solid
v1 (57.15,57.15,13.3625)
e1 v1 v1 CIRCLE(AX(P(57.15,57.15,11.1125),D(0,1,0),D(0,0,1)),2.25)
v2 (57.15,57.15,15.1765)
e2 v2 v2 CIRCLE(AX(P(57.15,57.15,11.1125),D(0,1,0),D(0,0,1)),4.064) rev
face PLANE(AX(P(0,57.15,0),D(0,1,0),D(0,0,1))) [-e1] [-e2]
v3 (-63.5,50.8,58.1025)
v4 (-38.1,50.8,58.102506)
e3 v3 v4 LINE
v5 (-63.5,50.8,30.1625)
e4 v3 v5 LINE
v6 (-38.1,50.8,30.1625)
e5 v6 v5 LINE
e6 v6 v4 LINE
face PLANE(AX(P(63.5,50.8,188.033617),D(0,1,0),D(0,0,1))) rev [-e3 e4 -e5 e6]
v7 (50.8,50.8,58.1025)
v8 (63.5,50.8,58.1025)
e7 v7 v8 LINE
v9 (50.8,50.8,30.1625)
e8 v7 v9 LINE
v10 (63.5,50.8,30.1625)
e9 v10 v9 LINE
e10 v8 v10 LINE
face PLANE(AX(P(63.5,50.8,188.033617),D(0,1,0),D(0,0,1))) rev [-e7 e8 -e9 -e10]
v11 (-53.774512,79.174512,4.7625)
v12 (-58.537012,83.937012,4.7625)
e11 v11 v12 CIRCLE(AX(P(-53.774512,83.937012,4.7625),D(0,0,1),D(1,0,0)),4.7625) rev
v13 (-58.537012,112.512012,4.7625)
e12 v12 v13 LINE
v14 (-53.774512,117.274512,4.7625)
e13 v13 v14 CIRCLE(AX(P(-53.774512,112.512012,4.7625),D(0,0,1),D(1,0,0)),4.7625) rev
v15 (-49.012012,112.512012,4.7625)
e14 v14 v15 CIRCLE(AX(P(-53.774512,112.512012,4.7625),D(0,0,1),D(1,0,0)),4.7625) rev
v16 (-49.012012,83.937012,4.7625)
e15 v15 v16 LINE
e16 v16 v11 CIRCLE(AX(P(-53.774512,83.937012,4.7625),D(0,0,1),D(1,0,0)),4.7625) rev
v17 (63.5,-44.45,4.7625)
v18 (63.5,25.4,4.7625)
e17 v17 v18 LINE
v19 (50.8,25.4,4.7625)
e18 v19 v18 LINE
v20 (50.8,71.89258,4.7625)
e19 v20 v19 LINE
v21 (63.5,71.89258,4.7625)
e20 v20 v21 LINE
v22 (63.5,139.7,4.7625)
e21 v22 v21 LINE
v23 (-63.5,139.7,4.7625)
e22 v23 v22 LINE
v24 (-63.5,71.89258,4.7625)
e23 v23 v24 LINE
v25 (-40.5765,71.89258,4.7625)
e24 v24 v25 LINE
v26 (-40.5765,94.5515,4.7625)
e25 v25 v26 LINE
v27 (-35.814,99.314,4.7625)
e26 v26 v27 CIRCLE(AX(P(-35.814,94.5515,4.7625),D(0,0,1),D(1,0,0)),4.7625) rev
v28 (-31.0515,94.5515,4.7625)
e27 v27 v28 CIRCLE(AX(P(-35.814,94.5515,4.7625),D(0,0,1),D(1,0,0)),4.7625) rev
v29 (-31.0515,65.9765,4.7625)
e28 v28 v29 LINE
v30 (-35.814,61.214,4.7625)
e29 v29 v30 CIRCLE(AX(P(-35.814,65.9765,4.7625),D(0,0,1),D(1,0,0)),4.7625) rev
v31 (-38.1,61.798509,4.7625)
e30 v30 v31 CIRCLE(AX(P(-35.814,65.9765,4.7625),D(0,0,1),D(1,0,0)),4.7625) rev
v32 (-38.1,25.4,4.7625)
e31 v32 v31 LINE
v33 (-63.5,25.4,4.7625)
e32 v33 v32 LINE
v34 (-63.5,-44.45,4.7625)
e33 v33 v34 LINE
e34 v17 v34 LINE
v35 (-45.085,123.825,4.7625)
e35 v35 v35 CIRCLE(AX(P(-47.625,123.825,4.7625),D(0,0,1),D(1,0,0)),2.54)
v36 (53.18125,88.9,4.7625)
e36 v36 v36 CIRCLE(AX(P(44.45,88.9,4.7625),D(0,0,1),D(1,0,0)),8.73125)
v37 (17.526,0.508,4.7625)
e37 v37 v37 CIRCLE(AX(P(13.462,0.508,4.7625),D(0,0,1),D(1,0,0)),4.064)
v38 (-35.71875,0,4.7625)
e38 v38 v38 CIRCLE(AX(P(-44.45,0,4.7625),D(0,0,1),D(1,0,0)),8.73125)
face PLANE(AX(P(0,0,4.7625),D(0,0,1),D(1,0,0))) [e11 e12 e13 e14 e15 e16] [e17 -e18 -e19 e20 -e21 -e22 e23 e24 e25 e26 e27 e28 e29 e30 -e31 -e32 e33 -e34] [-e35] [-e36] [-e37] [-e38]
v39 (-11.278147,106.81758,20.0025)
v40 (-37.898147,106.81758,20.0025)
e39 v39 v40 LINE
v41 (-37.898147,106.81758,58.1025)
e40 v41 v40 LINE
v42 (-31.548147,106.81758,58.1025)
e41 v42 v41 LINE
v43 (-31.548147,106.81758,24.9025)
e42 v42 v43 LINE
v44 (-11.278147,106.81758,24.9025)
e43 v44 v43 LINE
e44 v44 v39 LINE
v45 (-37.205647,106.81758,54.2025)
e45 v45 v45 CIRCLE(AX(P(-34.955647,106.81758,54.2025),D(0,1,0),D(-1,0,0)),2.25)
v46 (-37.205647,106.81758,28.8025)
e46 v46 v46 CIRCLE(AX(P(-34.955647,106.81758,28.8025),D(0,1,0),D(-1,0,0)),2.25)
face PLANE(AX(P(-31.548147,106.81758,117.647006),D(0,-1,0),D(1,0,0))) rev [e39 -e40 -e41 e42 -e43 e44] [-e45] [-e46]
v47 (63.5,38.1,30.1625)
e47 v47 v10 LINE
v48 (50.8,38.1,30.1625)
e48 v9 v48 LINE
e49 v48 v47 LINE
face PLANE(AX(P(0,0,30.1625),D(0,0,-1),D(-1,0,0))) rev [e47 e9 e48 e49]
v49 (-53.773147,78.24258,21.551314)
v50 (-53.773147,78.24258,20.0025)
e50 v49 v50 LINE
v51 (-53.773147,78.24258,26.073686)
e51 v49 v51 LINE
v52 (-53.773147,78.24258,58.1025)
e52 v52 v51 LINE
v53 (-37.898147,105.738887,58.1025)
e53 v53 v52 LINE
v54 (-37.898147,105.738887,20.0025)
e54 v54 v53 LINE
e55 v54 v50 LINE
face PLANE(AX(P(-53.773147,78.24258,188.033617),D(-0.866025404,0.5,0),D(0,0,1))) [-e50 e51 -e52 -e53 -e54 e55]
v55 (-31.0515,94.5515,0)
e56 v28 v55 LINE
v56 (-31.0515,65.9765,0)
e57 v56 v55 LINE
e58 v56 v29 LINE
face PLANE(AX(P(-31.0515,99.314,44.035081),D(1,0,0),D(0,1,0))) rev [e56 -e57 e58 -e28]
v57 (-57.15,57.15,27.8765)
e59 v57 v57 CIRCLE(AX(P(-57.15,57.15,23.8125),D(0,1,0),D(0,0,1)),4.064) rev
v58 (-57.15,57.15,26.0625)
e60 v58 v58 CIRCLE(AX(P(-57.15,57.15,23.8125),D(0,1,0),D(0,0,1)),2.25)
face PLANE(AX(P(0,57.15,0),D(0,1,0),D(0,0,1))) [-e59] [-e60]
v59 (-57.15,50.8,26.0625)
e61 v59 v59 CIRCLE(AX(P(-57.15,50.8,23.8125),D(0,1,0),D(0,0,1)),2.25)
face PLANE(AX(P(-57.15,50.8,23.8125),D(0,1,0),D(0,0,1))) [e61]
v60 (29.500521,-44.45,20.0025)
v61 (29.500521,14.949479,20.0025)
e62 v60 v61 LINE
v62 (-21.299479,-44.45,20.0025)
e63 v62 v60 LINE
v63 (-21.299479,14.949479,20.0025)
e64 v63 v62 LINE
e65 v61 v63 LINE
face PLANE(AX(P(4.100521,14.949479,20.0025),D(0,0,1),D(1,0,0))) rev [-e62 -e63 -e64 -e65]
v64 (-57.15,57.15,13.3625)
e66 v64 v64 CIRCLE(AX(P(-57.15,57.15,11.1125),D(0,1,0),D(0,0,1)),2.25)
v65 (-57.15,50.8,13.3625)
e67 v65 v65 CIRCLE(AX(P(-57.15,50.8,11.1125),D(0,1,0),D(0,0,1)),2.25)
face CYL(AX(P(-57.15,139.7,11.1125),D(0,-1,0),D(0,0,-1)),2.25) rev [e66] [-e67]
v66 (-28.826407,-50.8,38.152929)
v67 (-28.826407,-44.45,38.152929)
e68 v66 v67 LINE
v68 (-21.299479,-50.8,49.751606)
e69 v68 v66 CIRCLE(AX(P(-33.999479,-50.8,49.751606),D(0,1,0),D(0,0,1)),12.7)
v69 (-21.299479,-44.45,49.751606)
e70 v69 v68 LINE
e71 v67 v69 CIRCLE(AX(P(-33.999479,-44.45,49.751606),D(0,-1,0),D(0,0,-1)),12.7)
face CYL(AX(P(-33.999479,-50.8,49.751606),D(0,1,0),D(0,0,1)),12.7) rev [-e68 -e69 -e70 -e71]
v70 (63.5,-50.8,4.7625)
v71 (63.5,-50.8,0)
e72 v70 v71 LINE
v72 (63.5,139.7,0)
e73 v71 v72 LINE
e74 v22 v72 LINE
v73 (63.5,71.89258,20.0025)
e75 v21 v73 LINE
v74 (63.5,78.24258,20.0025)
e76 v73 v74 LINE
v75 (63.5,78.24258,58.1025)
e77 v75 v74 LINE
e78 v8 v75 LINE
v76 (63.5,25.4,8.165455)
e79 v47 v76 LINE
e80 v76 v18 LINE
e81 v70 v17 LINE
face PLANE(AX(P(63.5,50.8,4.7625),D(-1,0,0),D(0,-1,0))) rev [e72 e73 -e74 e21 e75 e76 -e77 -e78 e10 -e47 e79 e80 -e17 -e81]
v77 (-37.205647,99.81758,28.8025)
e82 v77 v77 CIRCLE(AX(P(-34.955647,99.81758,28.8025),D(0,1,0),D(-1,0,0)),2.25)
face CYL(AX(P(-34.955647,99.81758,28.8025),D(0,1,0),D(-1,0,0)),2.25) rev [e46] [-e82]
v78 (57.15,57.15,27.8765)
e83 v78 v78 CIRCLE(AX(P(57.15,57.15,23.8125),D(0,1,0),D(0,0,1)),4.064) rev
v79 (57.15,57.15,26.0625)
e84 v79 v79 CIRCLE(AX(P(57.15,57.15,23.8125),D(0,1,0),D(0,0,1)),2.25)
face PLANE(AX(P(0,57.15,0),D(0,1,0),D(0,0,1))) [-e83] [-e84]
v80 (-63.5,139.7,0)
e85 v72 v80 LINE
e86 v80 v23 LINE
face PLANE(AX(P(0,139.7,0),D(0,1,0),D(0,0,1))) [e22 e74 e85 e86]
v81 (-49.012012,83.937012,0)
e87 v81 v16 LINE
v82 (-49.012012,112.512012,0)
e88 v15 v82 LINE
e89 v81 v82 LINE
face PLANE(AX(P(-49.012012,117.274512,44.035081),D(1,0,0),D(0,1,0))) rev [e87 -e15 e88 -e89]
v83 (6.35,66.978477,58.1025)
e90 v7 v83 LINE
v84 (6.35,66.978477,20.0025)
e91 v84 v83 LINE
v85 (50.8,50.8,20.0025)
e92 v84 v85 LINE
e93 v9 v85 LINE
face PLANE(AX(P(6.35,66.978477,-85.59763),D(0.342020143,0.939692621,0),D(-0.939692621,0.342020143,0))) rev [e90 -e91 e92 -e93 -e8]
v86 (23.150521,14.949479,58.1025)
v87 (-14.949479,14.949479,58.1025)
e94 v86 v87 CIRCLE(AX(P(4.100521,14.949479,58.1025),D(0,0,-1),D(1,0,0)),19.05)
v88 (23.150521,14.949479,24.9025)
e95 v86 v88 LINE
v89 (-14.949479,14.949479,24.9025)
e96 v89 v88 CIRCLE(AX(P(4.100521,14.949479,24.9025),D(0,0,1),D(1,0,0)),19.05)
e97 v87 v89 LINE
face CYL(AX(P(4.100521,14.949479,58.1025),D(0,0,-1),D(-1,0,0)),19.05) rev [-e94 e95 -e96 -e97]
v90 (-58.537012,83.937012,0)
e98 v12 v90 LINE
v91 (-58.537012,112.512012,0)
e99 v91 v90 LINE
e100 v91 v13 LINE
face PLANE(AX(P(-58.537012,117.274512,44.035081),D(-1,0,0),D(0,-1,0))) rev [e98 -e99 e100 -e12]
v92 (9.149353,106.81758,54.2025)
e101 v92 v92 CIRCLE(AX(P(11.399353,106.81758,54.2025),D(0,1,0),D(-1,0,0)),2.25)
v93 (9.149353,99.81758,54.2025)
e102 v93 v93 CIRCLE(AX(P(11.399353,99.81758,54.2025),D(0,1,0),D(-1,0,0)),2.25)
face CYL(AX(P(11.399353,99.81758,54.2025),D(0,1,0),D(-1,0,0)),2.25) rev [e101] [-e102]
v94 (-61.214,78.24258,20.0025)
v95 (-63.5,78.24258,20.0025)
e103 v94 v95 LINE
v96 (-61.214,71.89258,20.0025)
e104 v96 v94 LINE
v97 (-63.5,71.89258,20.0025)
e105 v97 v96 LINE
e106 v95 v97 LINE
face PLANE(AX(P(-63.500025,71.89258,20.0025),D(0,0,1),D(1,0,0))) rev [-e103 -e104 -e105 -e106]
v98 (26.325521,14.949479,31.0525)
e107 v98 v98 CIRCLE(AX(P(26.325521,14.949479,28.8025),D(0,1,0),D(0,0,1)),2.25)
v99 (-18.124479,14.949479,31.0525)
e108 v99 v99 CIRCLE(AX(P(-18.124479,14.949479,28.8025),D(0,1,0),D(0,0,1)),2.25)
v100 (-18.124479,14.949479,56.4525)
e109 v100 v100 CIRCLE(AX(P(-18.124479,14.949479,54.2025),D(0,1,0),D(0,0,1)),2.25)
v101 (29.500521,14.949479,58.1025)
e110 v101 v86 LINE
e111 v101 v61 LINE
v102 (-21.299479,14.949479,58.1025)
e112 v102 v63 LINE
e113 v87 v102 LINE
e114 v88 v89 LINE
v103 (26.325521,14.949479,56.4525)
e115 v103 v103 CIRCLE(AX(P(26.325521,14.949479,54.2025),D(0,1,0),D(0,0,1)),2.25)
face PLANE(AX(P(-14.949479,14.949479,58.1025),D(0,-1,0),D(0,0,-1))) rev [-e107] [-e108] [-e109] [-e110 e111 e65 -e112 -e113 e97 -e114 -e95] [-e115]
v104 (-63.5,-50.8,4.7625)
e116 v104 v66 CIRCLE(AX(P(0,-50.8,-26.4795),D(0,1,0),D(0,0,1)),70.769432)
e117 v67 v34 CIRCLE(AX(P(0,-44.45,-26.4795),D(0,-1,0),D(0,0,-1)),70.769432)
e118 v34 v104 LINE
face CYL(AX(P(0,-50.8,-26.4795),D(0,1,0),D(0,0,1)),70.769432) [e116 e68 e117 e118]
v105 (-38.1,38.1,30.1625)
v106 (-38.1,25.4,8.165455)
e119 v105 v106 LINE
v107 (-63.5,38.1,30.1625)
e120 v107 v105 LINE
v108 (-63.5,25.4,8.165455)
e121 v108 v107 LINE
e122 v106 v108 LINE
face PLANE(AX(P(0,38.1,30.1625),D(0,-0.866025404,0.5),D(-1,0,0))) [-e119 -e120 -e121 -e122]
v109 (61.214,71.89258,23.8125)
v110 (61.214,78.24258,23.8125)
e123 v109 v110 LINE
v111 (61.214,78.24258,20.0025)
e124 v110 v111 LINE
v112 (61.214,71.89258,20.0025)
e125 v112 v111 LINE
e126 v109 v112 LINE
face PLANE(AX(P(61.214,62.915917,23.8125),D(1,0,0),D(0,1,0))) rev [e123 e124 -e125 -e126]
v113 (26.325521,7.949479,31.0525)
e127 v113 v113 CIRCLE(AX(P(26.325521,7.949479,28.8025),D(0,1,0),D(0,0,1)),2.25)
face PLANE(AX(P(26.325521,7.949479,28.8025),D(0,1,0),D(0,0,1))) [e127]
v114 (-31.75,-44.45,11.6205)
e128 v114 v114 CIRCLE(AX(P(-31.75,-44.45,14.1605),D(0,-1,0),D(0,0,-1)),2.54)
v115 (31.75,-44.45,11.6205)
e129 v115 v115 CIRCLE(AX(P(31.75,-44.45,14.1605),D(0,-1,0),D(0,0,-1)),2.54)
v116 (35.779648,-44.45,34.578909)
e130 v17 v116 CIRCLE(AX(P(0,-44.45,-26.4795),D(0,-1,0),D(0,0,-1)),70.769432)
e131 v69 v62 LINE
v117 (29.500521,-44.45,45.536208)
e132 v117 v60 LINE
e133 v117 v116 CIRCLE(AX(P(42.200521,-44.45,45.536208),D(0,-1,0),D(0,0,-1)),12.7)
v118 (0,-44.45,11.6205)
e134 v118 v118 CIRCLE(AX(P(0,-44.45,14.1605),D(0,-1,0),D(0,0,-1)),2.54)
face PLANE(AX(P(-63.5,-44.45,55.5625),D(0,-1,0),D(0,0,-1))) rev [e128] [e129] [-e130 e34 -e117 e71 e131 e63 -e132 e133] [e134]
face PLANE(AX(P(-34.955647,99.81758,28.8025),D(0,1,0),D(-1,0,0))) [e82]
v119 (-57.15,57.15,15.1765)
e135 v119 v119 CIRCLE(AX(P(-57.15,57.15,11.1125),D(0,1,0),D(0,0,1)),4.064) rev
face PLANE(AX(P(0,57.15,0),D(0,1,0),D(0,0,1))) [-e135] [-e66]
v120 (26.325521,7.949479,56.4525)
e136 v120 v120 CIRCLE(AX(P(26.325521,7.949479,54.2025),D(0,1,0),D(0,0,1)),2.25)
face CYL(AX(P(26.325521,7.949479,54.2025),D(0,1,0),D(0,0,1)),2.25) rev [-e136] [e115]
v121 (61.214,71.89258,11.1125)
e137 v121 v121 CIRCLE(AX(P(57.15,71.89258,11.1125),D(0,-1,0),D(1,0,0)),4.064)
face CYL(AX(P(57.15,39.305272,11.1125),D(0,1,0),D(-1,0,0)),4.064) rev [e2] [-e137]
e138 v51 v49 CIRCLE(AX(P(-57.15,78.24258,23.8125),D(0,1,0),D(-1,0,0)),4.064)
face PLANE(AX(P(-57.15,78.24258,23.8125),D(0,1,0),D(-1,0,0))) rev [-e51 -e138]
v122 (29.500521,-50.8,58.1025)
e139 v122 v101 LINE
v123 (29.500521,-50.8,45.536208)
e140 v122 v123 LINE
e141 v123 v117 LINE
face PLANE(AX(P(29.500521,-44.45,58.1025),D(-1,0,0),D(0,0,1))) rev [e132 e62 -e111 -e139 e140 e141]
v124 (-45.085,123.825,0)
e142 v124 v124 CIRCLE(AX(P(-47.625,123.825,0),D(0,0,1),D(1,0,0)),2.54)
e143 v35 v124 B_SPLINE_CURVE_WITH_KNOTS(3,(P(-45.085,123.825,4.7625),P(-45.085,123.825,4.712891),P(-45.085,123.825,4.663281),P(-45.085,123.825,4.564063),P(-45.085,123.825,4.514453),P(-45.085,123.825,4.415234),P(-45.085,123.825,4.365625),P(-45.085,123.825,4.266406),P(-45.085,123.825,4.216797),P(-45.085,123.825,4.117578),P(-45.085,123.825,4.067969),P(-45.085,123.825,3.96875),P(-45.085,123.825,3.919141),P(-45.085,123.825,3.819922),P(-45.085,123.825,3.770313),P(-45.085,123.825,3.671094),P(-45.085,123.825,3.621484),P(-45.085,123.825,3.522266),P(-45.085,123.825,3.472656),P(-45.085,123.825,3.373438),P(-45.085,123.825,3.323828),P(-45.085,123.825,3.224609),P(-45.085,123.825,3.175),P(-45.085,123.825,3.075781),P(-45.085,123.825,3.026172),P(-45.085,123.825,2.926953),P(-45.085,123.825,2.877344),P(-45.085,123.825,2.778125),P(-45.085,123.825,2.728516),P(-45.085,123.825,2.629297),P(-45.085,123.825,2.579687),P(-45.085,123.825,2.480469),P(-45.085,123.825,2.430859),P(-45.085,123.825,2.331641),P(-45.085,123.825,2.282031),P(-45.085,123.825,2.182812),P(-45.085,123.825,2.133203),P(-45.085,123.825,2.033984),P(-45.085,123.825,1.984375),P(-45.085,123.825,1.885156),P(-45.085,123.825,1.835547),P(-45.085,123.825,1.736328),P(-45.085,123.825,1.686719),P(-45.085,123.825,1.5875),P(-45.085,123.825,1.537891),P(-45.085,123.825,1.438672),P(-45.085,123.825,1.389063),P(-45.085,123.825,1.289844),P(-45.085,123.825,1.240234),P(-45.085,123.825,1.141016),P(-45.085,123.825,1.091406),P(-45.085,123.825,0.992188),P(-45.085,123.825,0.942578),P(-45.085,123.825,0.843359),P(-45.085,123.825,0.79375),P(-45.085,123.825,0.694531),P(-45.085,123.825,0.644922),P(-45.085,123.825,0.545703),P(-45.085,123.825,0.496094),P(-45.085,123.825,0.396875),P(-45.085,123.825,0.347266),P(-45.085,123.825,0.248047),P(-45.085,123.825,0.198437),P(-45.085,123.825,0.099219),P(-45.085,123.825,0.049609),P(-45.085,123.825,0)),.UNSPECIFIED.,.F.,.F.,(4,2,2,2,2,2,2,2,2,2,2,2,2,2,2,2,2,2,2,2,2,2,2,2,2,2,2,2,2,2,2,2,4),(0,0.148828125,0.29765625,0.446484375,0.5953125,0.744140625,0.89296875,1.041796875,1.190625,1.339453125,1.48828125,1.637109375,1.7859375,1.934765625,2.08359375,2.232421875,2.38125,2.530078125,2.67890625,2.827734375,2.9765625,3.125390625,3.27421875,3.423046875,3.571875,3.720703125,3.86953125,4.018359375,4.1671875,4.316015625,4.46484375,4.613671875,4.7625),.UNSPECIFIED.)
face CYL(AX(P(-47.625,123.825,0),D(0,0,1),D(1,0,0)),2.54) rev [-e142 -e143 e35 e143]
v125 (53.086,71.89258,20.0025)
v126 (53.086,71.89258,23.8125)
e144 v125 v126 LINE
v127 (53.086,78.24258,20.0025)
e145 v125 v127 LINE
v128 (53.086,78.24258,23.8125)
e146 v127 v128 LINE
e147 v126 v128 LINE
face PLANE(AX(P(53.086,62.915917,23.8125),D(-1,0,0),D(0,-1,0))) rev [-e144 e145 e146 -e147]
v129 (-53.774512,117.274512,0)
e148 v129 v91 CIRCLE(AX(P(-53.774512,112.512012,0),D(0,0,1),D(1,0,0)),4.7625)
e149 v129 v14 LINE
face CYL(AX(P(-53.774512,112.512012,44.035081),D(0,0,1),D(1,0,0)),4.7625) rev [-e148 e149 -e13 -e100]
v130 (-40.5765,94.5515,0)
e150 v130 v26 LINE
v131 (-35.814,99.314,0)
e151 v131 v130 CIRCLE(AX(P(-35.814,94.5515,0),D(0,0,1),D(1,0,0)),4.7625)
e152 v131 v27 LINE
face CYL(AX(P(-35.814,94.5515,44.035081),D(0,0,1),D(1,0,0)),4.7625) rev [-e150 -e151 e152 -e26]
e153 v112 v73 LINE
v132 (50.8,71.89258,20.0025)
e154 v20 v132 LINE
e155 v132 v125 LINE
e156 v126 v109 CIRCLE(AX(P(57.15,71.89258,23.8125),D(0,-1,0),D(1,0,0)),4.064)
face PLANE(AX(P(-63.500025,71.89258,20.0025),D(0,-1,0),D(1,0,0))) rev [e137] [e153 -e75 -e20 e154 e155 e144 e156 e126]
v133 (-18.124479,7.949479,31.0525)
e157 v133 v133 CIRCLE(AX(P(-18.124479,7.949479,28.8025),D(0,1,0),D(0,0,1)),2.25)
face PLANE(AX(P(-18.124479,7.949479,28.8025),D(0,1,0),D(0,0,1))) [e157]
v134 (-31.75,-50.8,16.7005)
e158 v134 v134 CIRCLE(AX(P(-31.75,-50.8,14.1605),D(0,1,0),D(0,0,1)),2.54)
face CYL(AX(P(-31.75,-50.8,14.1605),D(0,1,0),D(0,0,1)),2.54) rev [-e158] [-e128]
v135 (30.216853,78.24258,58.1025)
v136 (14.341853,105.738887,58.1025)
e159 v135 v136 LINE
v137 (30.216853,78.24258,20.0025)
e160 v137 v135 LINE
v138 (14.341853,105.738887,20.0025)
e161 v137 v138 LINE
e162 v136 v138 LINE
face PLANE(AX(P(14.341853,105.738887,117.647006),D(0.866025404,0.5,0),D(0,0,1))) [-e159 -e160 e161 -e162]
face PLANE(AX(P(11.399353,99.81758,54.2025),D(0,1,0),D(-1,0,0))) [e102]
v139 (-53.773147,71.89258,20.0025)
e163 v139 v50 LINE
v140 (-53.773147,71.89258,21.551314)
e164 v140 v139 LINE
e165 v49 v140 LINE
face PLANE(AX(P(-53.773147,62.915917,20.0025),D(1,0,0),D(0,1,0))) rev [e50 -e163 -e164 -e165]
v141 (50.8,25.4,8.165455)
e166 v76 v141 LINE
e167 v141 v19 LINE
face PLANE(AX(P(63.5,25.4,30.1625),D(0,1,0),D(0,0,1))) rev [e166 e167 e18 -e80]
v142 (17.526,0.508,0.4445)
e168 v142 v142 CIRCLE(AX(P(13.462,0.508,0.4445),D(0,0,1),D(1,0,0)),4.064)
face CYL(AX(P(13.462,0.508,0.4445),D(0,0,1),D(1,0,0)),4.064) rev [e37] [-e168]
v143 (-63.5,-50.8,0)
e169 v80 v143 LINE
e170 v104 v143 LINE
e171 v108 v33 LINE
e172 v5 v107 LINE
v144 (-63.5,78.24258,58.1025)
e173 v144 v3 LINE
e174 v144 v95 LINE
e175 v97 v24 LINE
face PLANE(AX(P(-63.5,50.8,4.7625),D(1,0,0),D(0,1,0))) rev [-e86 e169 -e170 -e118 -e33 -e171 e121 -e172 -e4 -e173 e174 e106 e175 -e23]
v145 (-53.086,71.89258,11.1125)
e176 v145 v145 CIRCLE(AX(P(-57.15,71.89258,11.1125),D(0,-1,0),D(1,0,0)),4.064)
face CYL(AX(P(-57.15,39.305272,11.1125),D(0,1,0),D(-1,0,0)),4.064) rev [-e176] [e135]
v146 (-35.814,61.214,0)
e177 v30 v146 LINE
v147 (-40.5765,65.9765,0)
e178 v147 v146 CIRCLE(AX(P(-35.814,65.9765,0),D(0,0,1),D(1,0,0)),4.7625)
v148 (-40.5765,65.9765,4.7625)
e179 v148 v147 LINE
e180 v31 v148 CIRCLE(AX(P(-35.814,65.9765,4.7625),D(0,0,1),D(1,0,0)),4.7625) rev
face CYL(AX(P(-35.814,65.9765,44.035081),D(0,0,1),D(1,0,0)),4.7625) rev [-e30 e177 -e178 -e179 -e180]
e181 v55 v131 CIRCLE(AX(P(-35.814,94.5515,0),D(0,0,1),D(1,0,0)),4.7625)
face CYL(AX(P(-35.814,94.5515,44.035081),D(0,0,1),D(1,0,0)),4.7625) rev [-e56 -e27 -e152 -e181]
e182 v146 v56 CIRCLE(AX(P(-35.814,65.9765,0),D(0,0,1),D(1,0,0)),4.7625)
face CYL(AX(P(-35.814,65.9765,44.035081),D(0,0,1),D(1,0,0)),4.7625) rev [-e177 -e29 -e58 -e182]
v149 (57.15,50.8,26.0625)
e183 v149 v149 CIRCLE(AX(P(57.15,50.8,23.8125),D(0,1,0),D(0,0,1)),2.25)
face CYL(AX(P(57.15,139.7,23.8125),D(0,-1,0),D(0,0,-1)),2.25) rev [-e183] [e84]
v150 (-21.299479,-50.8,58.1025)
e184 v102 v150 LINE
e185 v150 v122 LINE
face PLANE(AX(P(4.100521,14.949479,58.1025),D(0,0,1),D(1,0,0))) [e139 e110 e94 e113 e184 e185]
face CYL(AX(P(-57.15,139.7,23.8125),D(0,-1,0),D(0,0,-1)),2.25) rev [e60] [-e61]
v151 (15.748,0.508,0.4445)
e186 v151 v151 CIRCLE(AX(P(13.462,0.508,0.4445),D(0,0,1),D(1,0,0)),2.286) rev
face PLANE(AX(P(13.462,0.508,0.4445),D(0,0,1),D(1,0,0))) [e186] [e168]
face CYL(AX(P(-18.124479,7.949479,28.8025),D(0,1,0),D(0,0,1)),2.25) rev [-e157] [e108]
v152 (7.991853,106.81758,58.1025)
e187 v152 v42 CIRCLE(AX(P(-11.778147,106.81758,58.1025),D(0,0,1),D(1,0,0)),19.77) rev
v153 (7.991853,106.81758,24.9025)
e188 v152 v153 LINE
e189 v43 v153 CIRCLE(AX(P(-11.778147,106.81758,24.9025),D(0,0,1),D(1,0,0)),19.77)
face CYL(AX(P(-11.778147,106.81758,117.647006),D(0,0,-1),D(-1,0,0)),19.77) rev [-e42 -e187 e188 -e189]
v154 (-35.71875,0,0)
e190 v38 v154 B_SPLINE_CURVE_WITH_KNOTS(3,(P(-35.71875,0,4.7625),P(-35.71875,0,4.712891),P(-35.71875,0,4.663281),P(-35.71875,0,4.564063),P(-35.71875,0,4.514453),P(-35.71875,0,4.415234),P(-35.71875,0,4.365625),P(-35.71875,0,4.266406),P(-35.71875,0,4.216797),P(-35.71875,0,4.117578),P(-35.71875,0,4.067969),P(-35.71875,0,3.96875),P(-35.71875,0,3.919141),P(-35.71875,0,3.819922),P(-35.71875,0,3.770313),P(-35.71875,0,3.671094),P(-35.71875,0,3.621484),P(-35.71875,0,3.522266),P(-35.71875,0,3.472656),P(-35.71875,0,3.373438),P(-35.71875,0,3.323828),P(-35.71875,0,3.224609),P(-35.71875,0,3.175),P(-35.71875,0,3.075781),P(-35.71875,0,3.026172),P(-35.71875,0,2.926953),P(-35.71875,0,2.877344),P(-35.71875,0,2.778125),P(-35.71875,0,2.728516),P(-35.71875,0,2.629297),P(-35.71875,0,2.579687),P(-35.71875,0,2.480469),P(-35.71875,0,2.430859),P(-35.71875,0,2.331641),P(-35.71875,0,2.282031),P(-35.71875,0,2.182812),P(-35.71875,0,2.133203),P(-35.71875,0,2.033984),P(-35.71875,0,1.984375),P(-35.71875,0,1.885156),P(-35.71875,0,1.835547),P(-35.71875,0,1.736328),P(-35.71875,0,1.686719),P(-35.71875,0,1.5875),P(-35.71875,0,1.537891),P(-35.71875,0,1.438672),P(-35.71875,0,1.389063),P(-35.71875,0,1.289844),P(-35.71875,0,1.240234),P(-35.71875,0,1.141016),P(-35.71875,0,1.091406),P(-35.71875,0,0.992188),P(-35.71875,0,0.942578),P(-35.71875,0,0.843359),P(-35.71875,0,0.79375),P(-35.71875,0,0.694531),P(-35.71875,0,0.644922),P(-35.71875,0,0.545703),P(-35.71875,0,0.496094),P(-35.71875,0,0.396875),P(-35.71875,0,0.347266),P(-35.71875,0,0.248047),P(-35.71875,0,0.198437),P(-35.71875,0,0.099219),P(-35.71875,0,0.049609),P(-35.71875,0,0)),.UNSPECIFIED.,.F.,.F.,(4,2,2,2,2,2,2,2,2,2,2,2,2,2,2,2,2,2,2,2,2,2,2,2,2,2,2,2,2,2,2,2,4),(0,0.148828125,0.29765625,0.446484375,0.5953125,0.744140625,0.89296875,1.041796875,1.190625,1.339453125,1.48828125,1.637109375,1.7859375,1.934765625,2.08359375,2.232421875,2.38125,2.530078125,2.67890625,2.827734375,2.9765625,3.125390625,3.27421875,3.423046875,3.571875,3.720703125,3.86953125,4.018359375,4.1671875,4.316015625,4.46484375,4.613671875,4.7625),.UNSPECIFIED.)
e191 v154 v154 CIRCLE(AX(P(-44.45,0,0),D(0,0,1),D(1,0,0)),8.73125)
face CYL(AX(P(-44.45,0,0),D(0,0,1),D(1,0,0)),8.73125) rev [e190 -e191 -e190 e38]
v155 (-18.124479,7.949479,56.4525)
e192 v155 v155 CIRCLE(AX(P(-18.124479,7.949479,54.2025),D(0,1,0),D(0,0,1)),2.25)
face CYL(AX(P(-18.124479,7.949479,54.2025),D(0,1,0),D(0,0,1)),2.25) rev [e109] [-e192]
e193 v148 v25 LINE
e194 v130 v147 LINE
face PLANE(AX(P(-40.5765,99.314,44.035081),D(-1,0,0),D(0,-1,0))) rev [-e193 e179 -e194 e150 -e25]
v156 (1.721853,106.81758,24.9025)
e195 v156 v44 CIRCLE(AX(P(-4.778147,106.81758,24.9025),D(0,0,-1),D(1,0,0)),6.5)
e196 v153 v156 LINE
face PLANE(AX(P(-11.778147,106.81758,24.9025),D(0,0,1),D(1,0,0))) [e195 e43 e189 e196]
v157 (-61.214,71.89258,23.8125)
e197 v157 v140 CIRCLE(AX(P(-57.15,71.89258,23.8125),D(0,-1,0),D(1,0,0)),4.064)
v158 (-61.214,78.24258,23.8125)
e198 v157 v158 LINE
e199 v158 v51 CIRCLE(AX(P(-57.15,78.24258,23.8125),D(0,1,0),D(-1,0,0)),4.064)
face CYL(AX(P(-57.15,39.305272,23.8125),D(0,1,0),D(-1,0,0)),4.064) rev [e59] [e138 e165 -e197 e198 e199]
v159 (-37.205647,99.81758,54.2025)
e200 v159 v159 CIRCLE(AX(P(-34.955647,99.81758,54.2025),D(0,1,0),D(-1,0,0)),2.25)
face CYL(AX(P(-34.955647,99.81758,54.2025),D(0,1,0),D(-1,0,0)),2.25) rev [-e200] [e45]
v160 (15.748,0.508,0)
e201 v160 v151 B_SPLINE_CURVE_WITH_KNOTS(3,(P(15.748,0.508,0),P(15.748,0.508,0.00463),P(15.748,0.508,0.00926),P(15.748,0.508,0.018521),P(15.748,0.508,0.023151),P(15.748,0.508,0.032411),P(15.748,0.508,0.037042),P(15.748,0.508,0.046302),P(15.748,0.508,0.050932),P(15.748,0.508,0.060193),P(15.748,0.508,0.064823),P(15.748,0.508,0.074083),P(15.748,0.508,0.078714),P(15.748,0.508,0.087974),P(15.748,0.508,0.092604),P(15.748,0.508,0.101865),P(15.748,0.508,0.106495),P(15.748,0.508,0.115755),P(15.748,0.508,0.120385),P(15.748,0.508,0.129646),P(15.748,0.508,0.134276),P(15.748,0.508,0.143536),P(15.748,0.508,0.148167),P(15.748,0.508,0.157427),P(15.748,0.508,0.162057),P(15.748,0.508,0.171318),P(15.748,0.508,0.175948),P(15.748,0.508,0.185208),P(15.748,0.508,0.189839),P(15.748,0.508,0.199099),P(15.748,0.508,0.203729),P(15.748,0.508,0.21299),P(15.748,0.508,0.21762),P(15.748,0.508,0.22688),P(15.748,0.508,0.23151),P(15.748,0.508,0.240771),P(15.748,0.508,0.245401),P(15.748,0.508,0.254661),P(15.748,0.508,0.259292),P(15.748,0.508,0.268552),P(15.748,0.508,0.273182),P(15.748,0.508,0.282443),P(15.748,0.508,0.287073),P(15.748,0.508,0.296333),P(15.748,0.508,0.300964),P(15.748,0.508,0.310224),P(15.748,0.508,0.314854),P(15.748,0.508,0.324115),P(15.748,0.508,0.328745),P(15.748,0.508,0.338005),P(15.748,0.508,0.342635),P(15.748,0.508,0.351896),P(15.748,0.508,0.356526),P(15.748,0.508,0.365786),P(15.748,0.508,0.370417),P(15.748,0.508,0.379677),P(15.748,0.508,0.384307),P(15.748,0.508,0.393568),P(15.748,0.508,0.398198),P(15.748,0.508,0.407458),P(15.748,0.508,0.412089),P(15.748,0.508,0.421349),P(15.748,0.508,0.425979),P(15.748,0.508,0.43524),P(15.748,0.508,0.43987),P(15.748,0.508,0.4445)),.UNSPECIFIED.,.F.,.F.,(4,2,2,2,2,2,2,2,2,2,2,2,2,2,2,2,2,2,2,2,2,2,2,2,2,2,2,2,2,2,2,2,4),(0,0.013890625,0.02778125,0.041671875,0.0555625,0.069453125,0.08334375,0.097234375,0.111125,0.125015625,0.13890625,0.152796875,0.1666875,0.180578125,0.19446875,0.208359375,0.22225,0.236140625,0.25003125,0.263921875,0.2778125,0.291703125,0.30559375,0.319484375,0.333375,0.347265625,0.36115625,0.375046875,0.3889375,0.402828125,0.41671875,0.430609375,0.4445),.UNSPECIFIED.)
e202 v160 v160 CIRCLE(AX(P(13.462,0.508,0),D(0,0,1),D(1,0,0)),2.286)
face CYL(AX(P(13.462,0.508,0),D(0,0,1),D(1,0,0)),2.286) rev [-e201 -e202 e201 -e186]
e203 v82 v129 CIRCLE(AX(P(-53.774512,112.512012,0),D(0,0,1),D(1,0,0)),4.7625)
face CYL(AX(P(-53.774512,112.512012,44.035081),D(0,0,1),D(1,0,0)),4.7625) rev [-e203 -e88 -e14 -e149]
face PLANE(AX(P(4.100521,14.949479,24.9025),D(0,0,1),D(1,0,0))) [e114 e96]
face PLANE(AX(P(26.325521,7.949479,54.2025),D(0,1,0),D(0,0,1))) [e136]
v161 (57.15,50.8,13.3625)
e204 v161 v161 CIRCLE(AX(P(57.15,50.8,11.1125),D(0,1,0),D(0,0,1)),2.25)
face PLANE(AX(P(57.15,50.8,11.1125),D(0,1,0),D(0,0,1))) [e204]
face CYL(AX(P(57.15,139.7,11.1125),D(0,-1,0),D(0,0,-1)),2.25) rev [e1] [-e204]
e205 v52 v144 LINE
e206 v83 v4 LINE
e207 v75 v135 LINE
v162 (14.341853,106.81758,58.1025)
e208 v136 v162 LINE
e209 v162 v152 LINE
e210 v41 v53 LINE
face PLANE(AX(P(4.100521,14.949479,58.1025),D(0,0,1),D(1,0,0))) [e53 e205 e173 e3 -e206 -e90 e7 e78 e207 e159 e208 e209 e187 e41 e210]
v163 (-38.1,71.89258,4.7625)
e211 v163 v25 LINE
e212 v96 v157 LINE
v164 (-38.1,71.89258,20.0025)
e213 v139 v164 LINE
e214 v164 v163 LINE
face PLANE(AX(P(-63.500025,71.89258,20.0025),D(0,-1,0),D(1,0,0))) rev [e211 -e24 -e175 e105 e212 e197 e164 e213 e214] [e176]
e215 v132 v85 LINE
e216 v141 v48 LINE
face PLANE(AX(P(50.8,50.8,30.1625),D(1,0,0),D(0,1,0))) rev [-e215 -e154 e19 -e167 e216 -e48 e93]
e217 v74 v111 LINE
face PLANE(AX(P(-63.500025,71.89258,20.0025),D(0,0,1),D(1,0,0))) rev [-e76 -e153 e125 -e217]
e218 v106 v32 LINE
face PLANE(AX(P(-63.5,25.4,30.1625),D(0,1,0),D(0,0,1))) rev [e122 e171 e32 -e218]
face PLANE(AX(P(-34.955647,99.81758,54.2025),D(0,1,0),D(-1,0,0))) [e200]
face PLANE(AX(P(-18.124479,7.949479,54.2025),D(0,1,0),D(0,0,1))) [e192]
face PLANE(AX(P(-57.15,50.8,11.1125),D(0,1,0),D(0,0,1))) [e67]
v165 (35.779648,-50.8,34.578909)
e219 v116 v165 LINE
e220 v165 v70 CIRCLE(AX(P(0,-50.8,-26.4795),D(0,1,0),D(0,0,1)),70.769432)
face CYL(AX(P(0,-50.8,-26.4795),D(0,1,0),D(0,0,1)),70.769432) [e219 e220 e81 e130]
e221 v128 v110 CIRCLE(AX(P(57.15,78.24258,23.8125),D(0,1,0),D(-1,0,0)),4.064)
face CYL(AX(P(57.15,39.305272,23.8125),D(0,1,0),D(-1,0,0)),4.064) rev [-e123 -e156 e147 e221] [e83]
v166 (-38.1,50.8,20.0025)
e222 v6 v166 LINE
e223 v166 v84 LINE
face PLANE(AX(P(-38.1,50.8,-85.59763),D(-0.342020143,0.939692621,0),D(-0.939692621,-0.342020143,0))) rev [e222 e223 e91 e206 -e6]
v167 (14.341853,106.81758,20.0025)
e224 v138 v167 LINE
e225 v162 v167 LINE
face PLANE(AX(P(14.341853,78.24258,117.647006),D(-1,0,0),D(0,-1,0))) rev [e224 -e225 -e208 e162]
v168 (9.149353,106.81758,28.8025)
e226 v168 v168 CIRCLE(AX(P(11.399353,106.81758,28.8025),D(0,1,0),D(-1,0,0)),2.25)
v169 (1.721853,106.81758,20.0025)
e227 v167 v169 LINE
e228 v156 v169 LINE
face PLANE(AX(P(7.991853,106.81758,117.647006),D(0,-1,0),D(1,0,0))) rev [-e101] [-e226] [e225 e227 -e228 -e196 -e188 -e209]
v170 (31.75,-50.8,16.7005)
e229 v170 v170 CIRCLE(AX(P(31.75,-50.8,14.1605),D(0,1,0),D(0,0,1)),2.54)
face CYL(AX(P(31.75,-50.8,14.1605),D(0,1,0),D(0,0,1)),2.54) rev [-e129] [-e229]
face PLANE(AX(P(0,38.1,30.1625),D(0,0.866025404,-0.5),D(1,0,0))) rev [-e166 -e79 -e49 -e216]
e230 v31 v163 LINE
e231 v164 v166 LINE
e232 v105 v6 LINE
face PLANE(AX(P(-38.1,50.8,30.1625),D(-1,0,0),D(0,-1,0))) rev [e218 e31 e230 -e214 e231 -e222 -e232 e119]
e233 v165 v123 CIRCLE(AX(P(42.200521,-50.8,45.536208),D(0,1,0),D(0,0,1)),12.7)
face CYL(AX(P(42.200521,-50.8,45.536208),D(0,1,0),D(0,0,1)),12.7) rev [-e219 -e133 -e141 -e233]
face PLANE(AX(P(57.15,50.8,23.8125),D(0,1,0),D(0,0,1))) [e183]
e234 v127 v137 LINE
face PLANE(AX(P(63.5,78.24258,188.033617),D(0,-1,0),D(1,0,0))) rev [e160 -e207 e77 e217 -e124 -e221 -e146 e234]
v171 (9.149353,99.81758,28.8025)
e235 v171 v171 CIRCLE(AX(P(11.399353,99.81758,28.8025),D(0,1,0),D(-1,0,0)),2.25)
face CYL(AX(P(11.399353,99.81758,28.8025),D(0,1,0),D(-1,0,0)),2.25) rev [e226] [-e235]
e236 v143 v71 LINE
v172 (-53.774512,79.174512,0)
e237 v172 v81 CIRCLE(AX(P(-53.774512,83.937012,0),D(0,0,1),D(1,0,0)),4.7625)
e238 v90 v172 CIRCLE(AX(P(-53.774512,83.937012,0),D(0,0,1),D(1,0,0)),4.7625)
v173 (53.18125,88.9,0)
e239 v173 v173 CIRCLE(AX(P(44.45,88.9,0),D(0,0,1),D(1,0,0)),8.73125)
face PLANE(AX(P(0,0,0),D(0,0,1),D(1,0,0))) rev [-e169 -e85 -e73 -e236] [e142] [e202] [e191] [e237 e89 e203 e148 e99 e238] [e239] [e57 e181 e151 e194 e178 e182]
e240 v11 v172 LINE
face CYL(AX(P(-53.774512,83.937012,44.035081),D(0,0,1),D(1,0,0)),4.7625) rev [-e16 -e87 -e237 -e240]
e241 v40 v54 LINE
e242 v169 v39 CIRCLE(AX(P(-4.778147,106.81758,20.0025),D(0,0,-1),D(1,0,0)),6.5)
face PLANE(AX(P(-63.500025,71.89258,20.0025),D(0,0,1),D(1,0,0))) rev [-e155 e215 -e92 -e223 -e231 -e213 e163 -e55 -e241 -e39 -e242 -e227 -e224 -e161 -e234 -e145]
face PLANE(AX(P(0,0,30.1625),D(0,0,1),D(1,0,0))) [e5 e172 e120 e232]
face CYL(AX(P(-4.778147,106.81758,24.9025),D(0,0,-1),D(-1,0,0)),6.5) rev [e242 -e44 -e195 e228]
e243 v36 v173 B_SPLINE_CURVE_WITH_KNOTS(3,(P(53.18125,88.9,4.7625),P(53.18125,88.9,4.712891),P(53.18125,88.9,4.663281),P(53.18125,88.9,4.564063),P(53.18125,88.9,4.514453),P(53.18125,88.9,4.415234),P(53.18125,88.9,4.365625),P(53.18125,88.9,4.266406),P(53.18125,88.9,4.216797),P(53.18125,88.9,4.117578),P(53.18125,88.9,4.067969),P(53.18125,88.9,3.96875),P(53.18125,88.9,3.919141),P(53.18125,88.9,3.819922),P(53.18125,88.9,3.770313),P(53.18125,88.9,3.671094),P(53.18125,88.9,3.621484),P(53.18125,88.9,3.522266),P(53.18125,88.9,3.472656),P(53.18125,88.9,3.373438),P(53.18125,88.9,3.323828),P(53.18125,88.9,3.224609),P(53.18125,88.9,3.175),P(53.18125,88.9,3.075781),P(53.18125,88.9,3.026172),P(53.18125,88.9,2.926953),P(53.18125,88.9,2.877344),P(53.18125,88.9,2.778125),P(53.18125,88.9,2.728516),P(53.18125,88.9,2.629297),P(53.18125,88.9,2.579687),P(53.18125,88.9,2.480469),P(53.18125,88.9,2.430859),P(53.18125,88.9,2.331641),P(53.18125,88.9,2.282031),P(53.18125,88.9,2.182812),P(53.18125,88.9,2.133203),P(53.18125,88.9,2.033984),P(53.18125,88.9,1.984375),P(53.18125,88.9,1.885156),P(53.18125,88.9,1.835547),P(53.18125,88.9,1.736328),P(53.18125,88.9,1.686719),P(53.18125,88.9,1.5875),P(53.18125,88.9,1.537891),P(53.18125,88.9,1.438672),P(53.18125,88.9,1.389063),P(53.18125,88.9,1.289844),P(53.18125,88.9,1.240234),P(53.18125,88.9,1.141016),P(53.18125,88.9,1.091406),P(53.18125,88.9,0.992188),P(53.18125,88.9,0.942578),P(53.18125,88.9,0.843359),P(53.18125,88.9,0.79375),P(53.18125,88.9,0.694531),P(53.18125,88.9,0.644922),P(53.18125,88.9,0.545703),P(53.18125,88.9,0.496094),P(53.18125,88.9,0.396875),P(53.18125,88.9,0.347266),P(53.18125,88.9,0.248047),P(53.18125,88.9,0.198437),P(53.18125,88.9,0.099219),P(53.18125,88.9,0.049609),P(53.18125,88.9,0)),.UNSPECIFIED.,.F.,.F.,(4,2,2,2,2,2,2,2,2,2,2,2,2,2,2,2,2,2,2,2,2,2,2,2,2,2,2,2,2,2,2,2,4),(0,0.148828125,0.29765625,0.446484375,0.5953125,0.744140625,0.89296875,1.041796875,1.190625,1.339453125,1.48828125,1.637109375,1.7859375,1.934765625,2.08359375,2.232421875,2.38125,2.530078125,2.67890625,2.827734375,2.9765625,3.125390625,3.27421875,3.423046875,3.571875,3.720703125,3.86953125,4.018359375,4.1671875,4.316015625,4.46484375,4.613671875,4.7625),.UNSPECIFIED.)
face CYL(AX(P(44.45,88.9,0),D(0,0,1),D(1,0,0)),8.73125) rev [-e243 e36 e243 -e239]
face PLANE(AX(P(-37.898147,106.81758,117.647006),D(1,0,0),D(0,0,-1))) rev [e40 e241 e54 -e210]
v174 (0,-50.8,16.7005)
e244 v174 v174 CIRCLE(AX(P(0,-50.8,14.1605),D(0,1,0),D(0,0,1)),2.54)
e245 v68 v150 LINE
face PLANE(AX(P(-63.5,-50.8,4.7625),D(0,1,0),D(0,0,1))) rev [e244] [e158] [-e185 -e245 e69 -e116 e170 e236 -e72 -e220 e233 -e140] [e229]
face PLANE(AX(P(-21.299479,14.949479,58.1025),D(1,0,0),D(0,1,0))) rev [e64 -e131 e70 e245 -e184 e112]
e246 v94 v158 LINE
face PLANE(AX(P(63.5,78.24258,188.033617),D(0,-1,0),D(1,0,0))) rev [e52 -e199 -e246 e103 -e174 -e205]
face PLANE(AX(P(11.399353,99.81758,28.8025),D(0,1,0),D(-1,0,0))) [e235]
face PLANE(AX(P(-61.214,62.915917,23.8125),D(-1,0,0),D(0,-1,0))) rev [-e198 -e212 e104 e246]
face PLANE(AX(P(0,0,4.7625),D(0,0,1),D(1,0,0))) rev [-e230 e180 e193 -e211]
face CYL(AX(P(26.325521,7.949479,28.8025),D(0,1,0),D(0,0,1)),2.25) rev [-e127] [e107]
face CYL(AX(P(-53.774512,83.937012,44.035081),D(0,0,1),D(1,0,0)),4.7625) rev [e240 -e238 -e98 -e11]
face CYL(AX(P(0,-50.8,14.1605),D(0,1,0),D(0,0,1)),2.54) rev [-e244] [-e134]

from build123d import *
from OCP.BRepFilletAPI import BRepFilletAPI_MakeChamfer

# Parameters (mm, degrees)
SKETCH1_W                      = 127
SKETCH1_H                      = 101.6
BOSS_EXTRUDE1_DEPTH            = 4.7625
SKETCH2_W                      = 127
SKETCH2_H                      = 6.35
BOSS_EXTRUDE2_DEPTH            = 50.8
CUT_EXTRUDE1_DEPTH             = 96.882897328
CUT_EXTRUDE1_DEPTH_BACK        = 96.882897328
SKETCH3_R                      = 8.73125
CUT_EXTRUDE2_DEPTH             = 96.882897328
CUT_EXTRUDE2_DEPTH_BACK        = 96.882897328
SKETCH4_R                      = 2.286
CUT_EXTRUDE3_DEPTH             = 128.247805114
CUT_EXTRUDE3_DEPTH_BACK        = 128.247805114
SKETCH5_R                      = 2.54
CUT_EXTRUDE4_START             = -6.35
CUT_EXTRUDE4_DEPTH             = 6.35
SKETCH7_R                      = 4.064
CUT_EXTRUDE5_DEPTH             = 4.318
BOSS_EXTRUDE3_DEPTH            = 38.1
BOSS_EXTRUDE4_DEPTH            = 4.9
SKETCH15_W                     = 25.4
SKETCH15_H                     = 25.4
SKETCH15_W_2                   = 12.7
BOSS_EXTRUDE5_DEPTH            = 25.4
CHAMFER1_SIZE                  = 12.7
CHAMFER1_SIZE2                 = 21.997045256
SKETCH17_W                     = 127
SKETCH17_H                     = 4.7625
BOSS_EXTRUDE6_DEPTH            = 88.9
CUT_EXTRUDE7_DEPTH             = 163.460750952
CUT_EXTRUDE7_DEPTH_BACK        = 163.460750952
SKETCH18_R                     = 8.73125
SKETCH31_R                     = 2.249999945
CUT_EXTRUDE16_DEPTH            = 7
BOSS_EXTRUDE7_DEPTH            = 53.34
SKETCH20_W                     = 127
SKETCH20_H                     = 27.442580258
BOSS_EXTRUDE8_DEPTH            = 53.34
CUT_EXTRUDE8_REACH             = 166.086
CUT_EXTRUDE8_DIRECTION_2_DEPTH = 165.086076515
CHAMFER2_SIZE                  = 15.875
CHAMFER2_SIZE2                 = 27.49630657
CUT_EXTRUDE9_DEPTH             = 198.537314212
CUT_EXTRUDE9_DEPTH_BACK        = 198.537314212
SKETCH22_W                     = 15.24
SKETCH22_H                     = 47.382896715
SKETCH23_W                     = 88.9
SKETCH23_H                     = 15.24
CUT_EXTRUDE10_DEPTH            = 134.156714086
BOSS_EXTRUDE9_DEPTH            = 4.9
SKETCH16_R                     = 2.25
CUT_EXTRUDE6_DEPTH             = 134.156714086
SKETCH26_R                     = 4.064
CUT_EXTRUDE11_DEPTH            = 21.092580258
SKETCH27_W                     = 7.440852829
SKETCH27_H                     = 3.81
SKETCH27_W_2                   = 8.128
CUT_EXTRUDE12_DEPTH            = 6.35
CUT_EXTRUDE13_DEPTH            = 163.460750952
CUT_EXTRUDE13_DEPTH_BACK       = 163.460750952
SKETCH28_R                     = 2.54
CUT_EXTRUDE14_DEPTH            = 165.086076515
CUT_EXTRUDE14_DEPTH_BACK       = 4.7625
SKETCH29_W                     = 9.525
SKETCH29_H                     = 38.1
FILLET1_R                      = 4.7625
SKETCH30_R                     = 2.25
CUT_EXTRUDE15_DEPTH            = 7
BOSS_EXTRUDE10_START           = 6.35
BOSS_EXTRUDE10_DEPTH           = 6.35
FILLET2_R                      = 12.7


# Read off the part's stored shape, not the designer's step: Cut-Extrude4
with BuildPart() as part:
    # Sketch1 → Boss-Extrude1 (new body)
    with BuildSketch(Plane.XY):
        Rectangle(SKETCH1_W, SKETCH1_H)
    extrude(amount=BOSS_EXTRUDE1_DEPTH)

    # Sketch2 → Boss-Extrude2 (add)
    with BuildSketch(Plane.XY.offset(4.7625)):
        with Locations((0, -47.625)):
            Rectangle(SKETCH2_W, SKETCH2_H)
    extrude(amount=BOSS_EXTRUDE2_DEPTH)

    # Sketch3 → Cut-Extrude1 (cut, two sides: drawn at the far end of the back side and taken through both)
    with BuildSketch(Plane.XY.offset(4.7625).offset(-CUT_EXTRUDE1_DEPTH_BACK)):
        with Locations((-44.45, 0)):
            Circle(SKETCH3_R)
    extrude(amount=CUT_EXTRUDE1_DEPTH + CUT_EXTRUDE1_DEPTH_BACK, mode=Mode.SUBTRACT)

    # Sketch4 → Cut-Extrude2 (cut, two sides: drawn at the far end of the back side and taken through both)
    with BuildSketch(Plane.XY.offset(4.7625).offset(-CUT_EXTRUDE2_DEPTH_BACK)):
        with Locations((13.462, 0.508)):
            Circle(SKETCH4_R)
    extrude(amount=CUT_EXTRUDE2_DEPTH + CUT_EXTRUDE2_DEPTH_BACK, mode=Mode.SUBTRACT)

    # Sketch5 → Cut-Extrude3 (cut, two sides: drawn at the far end of the back side and taken through both)
    with BuildSketch(Plane(origin=(0, -44.45, 0), x_dir=(1, 0, 0), z_dir=(0, 1, 0)).offset(-CUT_EXTRUDE3_DEPTH_BACK)):
        with Locations(Location((-31.75, -14.1605, 0), (0, 0, 270))):
            Circle(SKETCH5_R)
        with Locations(Location((0, -14.1605, 0), (0, 0, 270))):
            Circle(SKETCH5_R)
        with Locations(Location((31.75, -14.1605, 0), (0, 0, 270))):
            Circle(SKETCH5_R)
    extrude(amount=CUT_EXTRUDE3_DEPTH + CUT_EXTRUDE3_DEPTH_BACK, mode=Mode.SUBTRACT)

    # Cut-Extrude4 outline → Cut-Extrude4 (cut)
    with BuildSketch(Plane(origin=(0, -44.45, 0), x_dir=(1, 0, 0), z_dir=(0, 1, 0)).offset(CUT_EXTRUDE4_START)):
        with BuildLine():
            ThreePointArc((63.5, -4.7625), (0, -44.289932413), (-63.5, -4.7625))
            Line((-63.5, -4.7625), (-63.5, -55.5625))
            Line((-63.5, -55.5625), (63.5, -55.5625))
            Line((63.5, -55.5625), (63.5, -4.7625))
        make_face()
    extrude(amount=CUT_EXTRUDE4_DEPTH, mode=Mode.SUBTRACT)

    # Sketch7 → Cut-Extrude5 (cut)
    with BuildSketch(Plane.XY.offset(4.7625)):
        with Locations((13.462, 0.508)):
            Circle(SKETCH7_R)
    extrude(amount=-CUT_EXTRUDE5_DEPTH, mode=Mode.SUBTRACT)

    # Sketch11 → Boss-Extrude3 (add)
    with BuildSketch(Plane.XY.offset(20.0025)):
        with BuildLine():
            Line((-14.949479175, 14.949479175), (-21.299479175, 14.949479175))
            Line((-21.299479175, 14.949479175), (-21.299479175, -44.45))
            Line((-21.299479175, -44.45), (29.500520825, -44.45))
            Line((29.500520825, -44.45), (29.500520825, 14.949479175))
            Line((29.500520825, 14.949479175), (23.150520825, 14.949479175))
            ThreePointArc((23.150520825, 14.949479175), (4.100520825, -4.100520825), (-14.949479175, 14.949479175))
        make_face()
    extrude(amount=BOSS_EXTRUDE3_DEPTH)

    # Sketch14 → Boss-Extrude4 (add)
    with BuildSketch(Plane.XY.offset(20.0025)):
        with BuildLine():
            Line((-14.949479175, 14.949479175), (23.150520825, 14.949479175))
            ThreePointArc((23.150520825, 14.949479175), (4.100520825, -4.100520825), (-14.949479175, 14.949479175))
        make_face()
    extrude(amount=BOSS_EXTRUDE4_DEPTH)

    # Sketch15 → Boss-Extrude5 (add)
    with BuildSketch(Plane.XY.offset(4.7625)):
        with Locations((-50.8, 38.1)):
            Rectangle(SKETCH15_W, SKETCH15_H)
        with Locations((57.15, 38.1)):
            Rectangle(SKETCH15_W_2, SKETCH15_H)
    extrude(amount=BOSS_EXTRUDE5_DEPTH)

    # Chamfer1: one chamfer whose edges measure the first distance from different faces: ONE call of the kernel's chamfer builder (chamfer() names one face for all edges)
    chamfer1_edges_1 = [part.edges().sort_by_distance(p)[0] for p in [
        (-50.8, 25.4, 30.1625),
    ]]
    chamfer1_side_1 = [part.faces().sort_by_distance(p)[0] for p in [
        (-50.8, 38.1, 30.1625),
    ]]
    chamfer1_edges_2 = [part.edges().sort_by_distance(p)[0] for p in [
        (57.15, 25.4, 30.1625),
    ]]
    chamfer1_side_2 = [part.faces().sort_by_distance(p)[0] for p in [
        (57.15, 38.1, 30.1625),
    ]]
    chamfer1 = BRepFilletAPI_MakeChamfer(part.part.solid().wrapped)
    for e in chamfer1_edges_1:
        chamfer1.Add(CHAMFER1_SIZE, CHAMFER1_SIZE2, e.wrapped, chamfer1_side_1[0].wrapped)  # the first distance lies on this face
    for e in chamfer1_edges_2:
        chamfer1.Add(CHAMFER1_SIZE, CHAMFER1_SIZE2, e.wrapped, chamfer1_side_2[0].wrapped)  # the first distance lies on this face
    add(Compound.cast(chamfer1.Shape()), mode=Mode.REPLACE)

    # Sketch17 → Boss-Extrude6 (add)
    with BuildSketch(Plane(origin=(0, 50.8, 0), x_dir=(1, 0, 0), z_dir=(0, 1, 0))):
        with Locations((0, -2.38125)):
            Rectangle(SKETCH17_W, SKETCH17_H)
    extrude(amount=BOSS_EXTRUDE6_DEPTH)

    # Sketch18 → Cut-Extrude7 (cut, two sides: drawn at the far end of the back side and taken through both)
    with BuildSketch(Plane.XY.offset(4.7625).offset(-CUT_EXTRUDE7_DEPTH_BACK)):
        with Locations((44.45, 88.9)):
            Circle(SKETCH18_R)
    extrude(amount=CUT_EXTRUDE7_DEPTH + CUT_EXTRUDE7_DEPTH_BACK, mode=Mode.SUBTRACT)

    # Sketch31 → Cut-Extrude16 (cut)
    with BuildSketch(Plane(origin=(0, 14.949479175, 0), x_dir=(1, 0, 0), z_dir=(0, 1, 0))):
        with Locations(Location((-18.124479175, -28.8025, 0), (0, 0, 270))):
            Circle(SKETCH31_R)
        with Locations(Location((26.325520825, -28.8025, 0), (0, 0, 270))):
            Circle(SKETCH31_R)
        with Locations(Location((26.325520825, -54.2025, 0), (0, 0, 270))):
            Circle(SKETCH31_R)
        with Locations(Location((-18.124479175, -54.2025, 0), (0, 0, 270))):
            Circle(SKETCH31_R)
    extrude(amount=-CUT_EXTRUDE16_DEPTH, mode=Mode.SUBTRACT)

    # Sketch19 → Boss-Extrude7 (add)
    with BuildSketch(Plane.XY.offset(4.7625)):
        with BuildLine():
            Line((-31.548147171, 106.817580258), (-37.898147171, 106.817580258))
            Line((-37.898147171, 106.817580258), (-37.898147171, 78.242580258))
            Line((-37.898147171, 78.242580258), (14.341852829, 78.242580258))
            Line((14.341852829, 78.242580258), (14.341852829, 106.817580258))
            Line((14.341852829, 106.817580258), (7.991852829, 106.817580258))
            ThreePointArc((7.991852829, 106.817580258), (-11.778147171, 87.047580258), (-31.548147171, 106.817580258))
        make_face()
    extrude(amount=BOSS_EXTRUDE7_DEPTH)

    # Sketch20 → Boss-Extrude8 (add)
    with BuildSketch(Plane.XY.offset(4.7625)):
        with Locations((0, 64.521290129)):
            Rectangle(SKETCH20_W, SKETCH20_H)
    extrude(amount=BOSS_EXTRUDE8_DEPTH)

    # Cut-Extrude8: up to this face of the body (flat: up to its plane)
    cut_extrude8_end = Plane(part.part.faces().sort_by_distance((2.240886483, 0.139322847, 4.7625))[0])
    # Sketch21 → Cut-Extrude8 (cut, up to the picked face)
    with BuildSketch(Plane.XY.offset(58.1025), mode=Mode.PRIVATE) as cut_extrude8_sk1:
        Polygon((-38.1, 50.8), (6.35, 66.978476913), (50.8, 50.8), align=None)
    cut_extrude8_tool1 = split(extrude(cut_extrude8_sk1.sketch, amount=-CUT_EXTRUDE8_REACH, mode=Mode.PRIVATE), bisect_by=cut_extrude8_end, keep=Keep.BOTH, mode=Mode.PRIVATE)
    add(cut_extrude8_tool1.solids().sort_by(Axis((6.35, 56.192826, 58.1025), (0, 0, -1)))[0], mode=Mode.SUBTRACT)

    # Sketch21 → Cut-Extrude8 direction 2 (cut)
    with BuildSketch(Plane.XY.offset(58.1025)):
        Polygon((-38.1, 50.8), (6.35, 66.978476913), (50.8, 50.8), align=None)
    extrude(amount=CUT_EXTRUDE8_DIRECTION_2_DEPTH, mode=Mode.SUBTRACT)

    # Chamfer2: one chamfer whose edges measure the first distance from different faces: ONE call of the kernel's chamfer builder (chamfer() names one face for all edges)
    chamfer2_edges_1 = [part.edges().sort_by_distance(p)[0] for p in [
        (-37.898147171, 78.242580258, 31.4325),
    ]]
    chamfer2_side_1 = [part.faces().sort_by_distance(p)[0] for p in [
        (-50.699073586, 78.242580258, 31.4325),
    ]]
    chamfer2_edges_2 = [part.edges().sort_by_distance(p)[0] for p in [
        (14.341852829, 78.242580258, 31.4325),
    ]]
    chamfer2_side_2 = [part.faces().sort_by_distance(p)[0] for p in [
        (38.920926414, 78.242580258, 31.4325),
    ]]
    chamfer2 = BRepFilletAPI_MakeChamfer(part.part.solid().wrapped)
    for e in chamfer2_edges_1:
        chamfer2.Add(CHAMFER2_SIZE, CHAMFER2_SIZE2, e.wrapped, chamfer2_side_1[0].wrapped)  # the first distance lies on this face
    for e in chamfer2_edges_2:
        chamfer2.Add(CHAMFER2_SIZE, CHAMFER2_SIZE2, e.wrapped, chamfer2_side_2[0].wrapped)  # the first distance lies on this face
    add(Compound.cast(chamfer2.Shape()), mode=Mode.REPLACE)

    # Sketch22 → Cut-Extrude9 (cut, two sides: drawn at the far end of the back side and taken through both)
    with BuildSketch(Plane(origin=(63.5, 0, 0), x_dir=(0, 0, -1), z_dir=(1, 0, 0)).offset(-CUT_EXTRUDE9_DEPTH_BACK)):
        with Locations((-12.3825, 95.584028616)):
            Rectangle(SKETCH22_W, SKETCH22_H)
    extrude(amount=CUT_EXTRUDE9_DEPTH + CUT_EXTRUDE9_DEPTH_BACK, mode=Mode.SUBTRACT)

    # Sketch23 → Cut-Extrude10 (cut, through all)
    with BuildSketch(Plane.XZ.offset(-50.8)):
        with Locations((6.35, 12.3825)):
            Rectangle(SKETCH23_W, SKETCH23_H)
    extrude(amount=-CUT_EXTRUDE10_DEPTH, mode=Mode.SUBTRACT)

    # Sketch24 → Boss-Extrude9 (add)
    with BuildSketch(Plane.XY.offset(20.0025)):
        with BuildLine():
            Line((-11.278147171, 106.817580258), (-31.548147171, 106.817580258))
            ThreePointArc((-31.548147171, 106.817580258), (-11.778147171, 87.047580258), (7.991852829, 106.817580258))
            Line((7.991852829, 106.817580258), (1.721852829, 106.817580258))
            ThreePointArc((1.721852829, 106.817580258), (-4.778147171, 100.317580258), (-11.278147171, 106.817580258))
        make_face()
    extrude(amount=BOSS_EXTRUDE9_DEPTH)

    # Sketch16 → Cut-Extrude6 (cut, through all)
    with BuildSketch(Plane(origin=(0, 50.8, 0), x_dir=(1, 0, 0), z_dir=(0, 1, 0))):
        with Locations((57.15, -11.1125)):
            Circle(SKETCH16_R)
        with Locations((57.15, -23.8125)):
            Circle(SKETCH16_R)
        with Locations((-57.15, -11.1125)):
            Circle(SKETCH16_R)
        with Locations((-57.15, -23.8125)):
            Circle(SKETCH16_R)
    extrude(amount=CUT_EXTRUDE6_DEPTH, mode=Mode.SUBTRACT)

    # Sketch26 → Cut-Extrude11 (cut)
    with BuildSketch(Plane(origin=(0, 78.242580258, 0), x_dir=(1, 0, 0), z_dir=(0, 1, 0))):
        with Locations(Location((-57.15, -11.1125, 0), (0, 0, 270))):
            Circle(SKETCH26_R)
        with Locations(Location((-57.15, -23.8125, 0), (0, 0, 110.364134806))):
            Circle(SKETCH26_R)
        with Locations(Location((57.15, -11.1125, 0), (0, 0, 270))):
            Circle(SKETCH26_R)
        with Locations(Location((57.15, -23.8125, 0), (0, 0, 110.364134806))):
            Circle(SKETCH26_R)
    extrude(amount=-CUT_EXTRUDE11_DEPTH, mode=Mode.SUBTRACT)

    # Sketch27 → Cut-Extrude12 (cut)
    with BuildSketch(Plane(origin=(0, 78.242580258, 0), x_dir=(1, 0, 0), z_dir=(0, 1, 0))):
        with Locations((-57.493573586, -21.9075)):
            Rectangle(SKETCH27_W, SKETCH27_H)
        with Locations((57.15, -21.9075)):
            Rectangle(SKETCH27_W_2, SKETCH27_H)
    extrude(amount=-CUT_EXTRUDE12_DEPTH, mode=Mode.SUBTRACT)

    # Sketch28 → Cut-Extrude13 (cut, two sides: drawn at the far end of the back side and taken through both)
    with BuildSketch(Plane.XY.offset(4.7625).offset(-CUT_EXTRUDE13_DEPTH_BACK)):
        with Locations((-47.625, 123.825)):
            Circle(SKETCH28_R)
    extrude(amount=CUT_EXTRUDE13_DEPTH + CUT_EXTRUDE13_DEPTH_BACK, mode=Mode.SUBTRACT)

    # Sketch29 → Cut-Extrude14 (cut, two sides: drawn at the far end of the back side and taken through both)
    with BuildSketch(Plane(origin=(0, 0, 0), x_dir=(-1, 0, 0), z_dir=(0, 0, -1)).offset(-CUT_EXTRUDE14_DEPTH_BACK)):
        with Locations((35.814, 80.264)):
            Rectangle(SKETCH29_W, SKETCH29_H)
        with Locations((53.774512242, 98.224512242)):
            Rectangle(SKETCH29_W, SKETCH29_H)
    extrude(amount=CUT_EXTRUDE14_DEPTH + CUT_EXTRUDE14_DEPTH_BACK, mode=Mode.SUBTRACT)

    # Fillet1
    # the kernel refuses this fillet: 4.7625 mm, written as the material it adds along each edge
    with BuildSketch(Plane(origin=(-40.5765, 61.214, 0), x_dir=(0, 1, 0), z_dir=(0, 0, 1)), Plane(origin=(-31.0515, 99.314, 4.7625), x_dir=(-1, 0, 0), z_dir=(0, 0, -1)), Plane(origin=(-31.0515, 61.214, 4.7625), x_dir=(0, 1, 0), z_dir=(0, 0, -1)), Plane(origin=(-49.012012242, 79.174512242, 4.7625), x_dir=(0, 1, 0), z_dir=(0, 0, -1))) as fillet1_piece_1:
        with BuildLine():
            CenterArc((FILLET1_R, -FILLET1_R), FILLET1_R, 90, 90)
            Line((0, -FILLET1_R), (0, 0))
            Line((0, 0), (FILLET1_R, 0))
        make_face()
    extrude(amount=4.7625)
    with BuildSketch(Plane(origin=(-40.5765, 99.314, 0), x_dir=(0, -1, 0), z_dir=(0, 0, 1)), Plane(origin=(-58.537012242, 79.174512242, 0), x_dir=(1, 0, 0), z_dir=(0, 0, 1)), Plane(origin=(-58.537012242, 117.274512242, 0), x_dir=(0, -1, 0), z_dir=(0, 0, 1)), Plane(origin=(-49.012012242, 117.274512242, 4.7625), x_dir=(0, -1, 0), z_dir=(0, 0, -1))) as fillet1_piece_2:
        with BuildLine():
            CenterArc((FILLET1_R, FILLET1_R), FILLET1_R, 180, 90)
            Line((0, FILLET1_R), (0, 0))
            Line((0, 0), (FILLET1_R, 0))
        make_face()
    extrude(amount=4.7625)

    # Sketch30 → Cut-Extrude15 (cut)
    with BuildSketch(Plane(origin=(0, 106.817580258, 0), x_dir=(1, 0, 0), z_dir=(0, 1, 0))):
        with Locations(Location((-34.955647171, -28.8025, 0), (0, 0, 180))):
            Circle(SKETCH30_R)
        with Locations(Location((11.399352829, -28.8025, 0), (0, 0, 180))):
            Circle(SKETCH30_R)
        with Locations(Location((11.399352829, -54.2025, 0), (0, 0, 180))):
            Circle(SKETCH30_R)
        with Locations(Location((-34.955647171, -54.2025, 0), (0, 0, 180))):
            Circle(SKETCH30_R)
    extrude(amount=-CUT_EXTRUDE15_DEPTH, mode=Mode.SUBTRACT)

    # Sketch32 → Boss-Extrude10 (add)
    with BuildSketch(Plane.XZ.offset(44.45).offset(BOSS_EXTRUDE10_START)):
        with BuildLine():
            Line((29.500520825, 37.84803559), (29.500520825, 58.1025))
            Line((29.500520825, 58.1025), (-21.299479175, 58.1025))
            Line((-21.299479175, 58.1025), (-21.299479175, 41.008608218))
            ThreePointArc((-21.299479175, 41.008608218), (4.394493813, 44.15336054), (29.500520825, 37.84803559))
        make_face()
    extrude(amount=-BOSS_EXTRUDE10_DEPTH)

    # Fillet2
    # the kernel refuses this fillet: 12.7 mm, written as the material it adds along each edge
    with BuildSketch(Plane(origin=(29.500520825, -50.8, 37.84803559), x_dir=(0.8869865601391139, 0, -0.46179523831735414), z_dir=(0, 1, 0))) as fillet2_piece_1:
        with BuildLine():
            CenterArc((7.714367933, -12.684105069), FILLET2_R, 92.866885824, 59.630102423)
            Line((-3.550361381, -6.819305543), (0, 0))
            ThreePointArc((0, 0), (3.539584142, -0.088572853), (7.079168284, 0))
        make_face()
    extrude(amount=6.35)
    with BuildSketch(Plane(origin=(-21.299479175, -50.8, 41.008608218), x_dir=(-0.9349712416147754, 0, -0.3547235224133371), z_dir=(0, 1, 0))) as fillet2_piece_2:
        with BuildLine():
            CenterArc((8.772787703, 12.679440479), FILLET2_R, 200.776500664, 65.96287418)
            Line((-3.101347065, 8.174451744), (0, 0))
            ThreePointArc((0, 0), (4.025218982, 0.114565799), (8.050437963, 0))
        make_face()
    extrude(amount=6.35)


solid = part.part
